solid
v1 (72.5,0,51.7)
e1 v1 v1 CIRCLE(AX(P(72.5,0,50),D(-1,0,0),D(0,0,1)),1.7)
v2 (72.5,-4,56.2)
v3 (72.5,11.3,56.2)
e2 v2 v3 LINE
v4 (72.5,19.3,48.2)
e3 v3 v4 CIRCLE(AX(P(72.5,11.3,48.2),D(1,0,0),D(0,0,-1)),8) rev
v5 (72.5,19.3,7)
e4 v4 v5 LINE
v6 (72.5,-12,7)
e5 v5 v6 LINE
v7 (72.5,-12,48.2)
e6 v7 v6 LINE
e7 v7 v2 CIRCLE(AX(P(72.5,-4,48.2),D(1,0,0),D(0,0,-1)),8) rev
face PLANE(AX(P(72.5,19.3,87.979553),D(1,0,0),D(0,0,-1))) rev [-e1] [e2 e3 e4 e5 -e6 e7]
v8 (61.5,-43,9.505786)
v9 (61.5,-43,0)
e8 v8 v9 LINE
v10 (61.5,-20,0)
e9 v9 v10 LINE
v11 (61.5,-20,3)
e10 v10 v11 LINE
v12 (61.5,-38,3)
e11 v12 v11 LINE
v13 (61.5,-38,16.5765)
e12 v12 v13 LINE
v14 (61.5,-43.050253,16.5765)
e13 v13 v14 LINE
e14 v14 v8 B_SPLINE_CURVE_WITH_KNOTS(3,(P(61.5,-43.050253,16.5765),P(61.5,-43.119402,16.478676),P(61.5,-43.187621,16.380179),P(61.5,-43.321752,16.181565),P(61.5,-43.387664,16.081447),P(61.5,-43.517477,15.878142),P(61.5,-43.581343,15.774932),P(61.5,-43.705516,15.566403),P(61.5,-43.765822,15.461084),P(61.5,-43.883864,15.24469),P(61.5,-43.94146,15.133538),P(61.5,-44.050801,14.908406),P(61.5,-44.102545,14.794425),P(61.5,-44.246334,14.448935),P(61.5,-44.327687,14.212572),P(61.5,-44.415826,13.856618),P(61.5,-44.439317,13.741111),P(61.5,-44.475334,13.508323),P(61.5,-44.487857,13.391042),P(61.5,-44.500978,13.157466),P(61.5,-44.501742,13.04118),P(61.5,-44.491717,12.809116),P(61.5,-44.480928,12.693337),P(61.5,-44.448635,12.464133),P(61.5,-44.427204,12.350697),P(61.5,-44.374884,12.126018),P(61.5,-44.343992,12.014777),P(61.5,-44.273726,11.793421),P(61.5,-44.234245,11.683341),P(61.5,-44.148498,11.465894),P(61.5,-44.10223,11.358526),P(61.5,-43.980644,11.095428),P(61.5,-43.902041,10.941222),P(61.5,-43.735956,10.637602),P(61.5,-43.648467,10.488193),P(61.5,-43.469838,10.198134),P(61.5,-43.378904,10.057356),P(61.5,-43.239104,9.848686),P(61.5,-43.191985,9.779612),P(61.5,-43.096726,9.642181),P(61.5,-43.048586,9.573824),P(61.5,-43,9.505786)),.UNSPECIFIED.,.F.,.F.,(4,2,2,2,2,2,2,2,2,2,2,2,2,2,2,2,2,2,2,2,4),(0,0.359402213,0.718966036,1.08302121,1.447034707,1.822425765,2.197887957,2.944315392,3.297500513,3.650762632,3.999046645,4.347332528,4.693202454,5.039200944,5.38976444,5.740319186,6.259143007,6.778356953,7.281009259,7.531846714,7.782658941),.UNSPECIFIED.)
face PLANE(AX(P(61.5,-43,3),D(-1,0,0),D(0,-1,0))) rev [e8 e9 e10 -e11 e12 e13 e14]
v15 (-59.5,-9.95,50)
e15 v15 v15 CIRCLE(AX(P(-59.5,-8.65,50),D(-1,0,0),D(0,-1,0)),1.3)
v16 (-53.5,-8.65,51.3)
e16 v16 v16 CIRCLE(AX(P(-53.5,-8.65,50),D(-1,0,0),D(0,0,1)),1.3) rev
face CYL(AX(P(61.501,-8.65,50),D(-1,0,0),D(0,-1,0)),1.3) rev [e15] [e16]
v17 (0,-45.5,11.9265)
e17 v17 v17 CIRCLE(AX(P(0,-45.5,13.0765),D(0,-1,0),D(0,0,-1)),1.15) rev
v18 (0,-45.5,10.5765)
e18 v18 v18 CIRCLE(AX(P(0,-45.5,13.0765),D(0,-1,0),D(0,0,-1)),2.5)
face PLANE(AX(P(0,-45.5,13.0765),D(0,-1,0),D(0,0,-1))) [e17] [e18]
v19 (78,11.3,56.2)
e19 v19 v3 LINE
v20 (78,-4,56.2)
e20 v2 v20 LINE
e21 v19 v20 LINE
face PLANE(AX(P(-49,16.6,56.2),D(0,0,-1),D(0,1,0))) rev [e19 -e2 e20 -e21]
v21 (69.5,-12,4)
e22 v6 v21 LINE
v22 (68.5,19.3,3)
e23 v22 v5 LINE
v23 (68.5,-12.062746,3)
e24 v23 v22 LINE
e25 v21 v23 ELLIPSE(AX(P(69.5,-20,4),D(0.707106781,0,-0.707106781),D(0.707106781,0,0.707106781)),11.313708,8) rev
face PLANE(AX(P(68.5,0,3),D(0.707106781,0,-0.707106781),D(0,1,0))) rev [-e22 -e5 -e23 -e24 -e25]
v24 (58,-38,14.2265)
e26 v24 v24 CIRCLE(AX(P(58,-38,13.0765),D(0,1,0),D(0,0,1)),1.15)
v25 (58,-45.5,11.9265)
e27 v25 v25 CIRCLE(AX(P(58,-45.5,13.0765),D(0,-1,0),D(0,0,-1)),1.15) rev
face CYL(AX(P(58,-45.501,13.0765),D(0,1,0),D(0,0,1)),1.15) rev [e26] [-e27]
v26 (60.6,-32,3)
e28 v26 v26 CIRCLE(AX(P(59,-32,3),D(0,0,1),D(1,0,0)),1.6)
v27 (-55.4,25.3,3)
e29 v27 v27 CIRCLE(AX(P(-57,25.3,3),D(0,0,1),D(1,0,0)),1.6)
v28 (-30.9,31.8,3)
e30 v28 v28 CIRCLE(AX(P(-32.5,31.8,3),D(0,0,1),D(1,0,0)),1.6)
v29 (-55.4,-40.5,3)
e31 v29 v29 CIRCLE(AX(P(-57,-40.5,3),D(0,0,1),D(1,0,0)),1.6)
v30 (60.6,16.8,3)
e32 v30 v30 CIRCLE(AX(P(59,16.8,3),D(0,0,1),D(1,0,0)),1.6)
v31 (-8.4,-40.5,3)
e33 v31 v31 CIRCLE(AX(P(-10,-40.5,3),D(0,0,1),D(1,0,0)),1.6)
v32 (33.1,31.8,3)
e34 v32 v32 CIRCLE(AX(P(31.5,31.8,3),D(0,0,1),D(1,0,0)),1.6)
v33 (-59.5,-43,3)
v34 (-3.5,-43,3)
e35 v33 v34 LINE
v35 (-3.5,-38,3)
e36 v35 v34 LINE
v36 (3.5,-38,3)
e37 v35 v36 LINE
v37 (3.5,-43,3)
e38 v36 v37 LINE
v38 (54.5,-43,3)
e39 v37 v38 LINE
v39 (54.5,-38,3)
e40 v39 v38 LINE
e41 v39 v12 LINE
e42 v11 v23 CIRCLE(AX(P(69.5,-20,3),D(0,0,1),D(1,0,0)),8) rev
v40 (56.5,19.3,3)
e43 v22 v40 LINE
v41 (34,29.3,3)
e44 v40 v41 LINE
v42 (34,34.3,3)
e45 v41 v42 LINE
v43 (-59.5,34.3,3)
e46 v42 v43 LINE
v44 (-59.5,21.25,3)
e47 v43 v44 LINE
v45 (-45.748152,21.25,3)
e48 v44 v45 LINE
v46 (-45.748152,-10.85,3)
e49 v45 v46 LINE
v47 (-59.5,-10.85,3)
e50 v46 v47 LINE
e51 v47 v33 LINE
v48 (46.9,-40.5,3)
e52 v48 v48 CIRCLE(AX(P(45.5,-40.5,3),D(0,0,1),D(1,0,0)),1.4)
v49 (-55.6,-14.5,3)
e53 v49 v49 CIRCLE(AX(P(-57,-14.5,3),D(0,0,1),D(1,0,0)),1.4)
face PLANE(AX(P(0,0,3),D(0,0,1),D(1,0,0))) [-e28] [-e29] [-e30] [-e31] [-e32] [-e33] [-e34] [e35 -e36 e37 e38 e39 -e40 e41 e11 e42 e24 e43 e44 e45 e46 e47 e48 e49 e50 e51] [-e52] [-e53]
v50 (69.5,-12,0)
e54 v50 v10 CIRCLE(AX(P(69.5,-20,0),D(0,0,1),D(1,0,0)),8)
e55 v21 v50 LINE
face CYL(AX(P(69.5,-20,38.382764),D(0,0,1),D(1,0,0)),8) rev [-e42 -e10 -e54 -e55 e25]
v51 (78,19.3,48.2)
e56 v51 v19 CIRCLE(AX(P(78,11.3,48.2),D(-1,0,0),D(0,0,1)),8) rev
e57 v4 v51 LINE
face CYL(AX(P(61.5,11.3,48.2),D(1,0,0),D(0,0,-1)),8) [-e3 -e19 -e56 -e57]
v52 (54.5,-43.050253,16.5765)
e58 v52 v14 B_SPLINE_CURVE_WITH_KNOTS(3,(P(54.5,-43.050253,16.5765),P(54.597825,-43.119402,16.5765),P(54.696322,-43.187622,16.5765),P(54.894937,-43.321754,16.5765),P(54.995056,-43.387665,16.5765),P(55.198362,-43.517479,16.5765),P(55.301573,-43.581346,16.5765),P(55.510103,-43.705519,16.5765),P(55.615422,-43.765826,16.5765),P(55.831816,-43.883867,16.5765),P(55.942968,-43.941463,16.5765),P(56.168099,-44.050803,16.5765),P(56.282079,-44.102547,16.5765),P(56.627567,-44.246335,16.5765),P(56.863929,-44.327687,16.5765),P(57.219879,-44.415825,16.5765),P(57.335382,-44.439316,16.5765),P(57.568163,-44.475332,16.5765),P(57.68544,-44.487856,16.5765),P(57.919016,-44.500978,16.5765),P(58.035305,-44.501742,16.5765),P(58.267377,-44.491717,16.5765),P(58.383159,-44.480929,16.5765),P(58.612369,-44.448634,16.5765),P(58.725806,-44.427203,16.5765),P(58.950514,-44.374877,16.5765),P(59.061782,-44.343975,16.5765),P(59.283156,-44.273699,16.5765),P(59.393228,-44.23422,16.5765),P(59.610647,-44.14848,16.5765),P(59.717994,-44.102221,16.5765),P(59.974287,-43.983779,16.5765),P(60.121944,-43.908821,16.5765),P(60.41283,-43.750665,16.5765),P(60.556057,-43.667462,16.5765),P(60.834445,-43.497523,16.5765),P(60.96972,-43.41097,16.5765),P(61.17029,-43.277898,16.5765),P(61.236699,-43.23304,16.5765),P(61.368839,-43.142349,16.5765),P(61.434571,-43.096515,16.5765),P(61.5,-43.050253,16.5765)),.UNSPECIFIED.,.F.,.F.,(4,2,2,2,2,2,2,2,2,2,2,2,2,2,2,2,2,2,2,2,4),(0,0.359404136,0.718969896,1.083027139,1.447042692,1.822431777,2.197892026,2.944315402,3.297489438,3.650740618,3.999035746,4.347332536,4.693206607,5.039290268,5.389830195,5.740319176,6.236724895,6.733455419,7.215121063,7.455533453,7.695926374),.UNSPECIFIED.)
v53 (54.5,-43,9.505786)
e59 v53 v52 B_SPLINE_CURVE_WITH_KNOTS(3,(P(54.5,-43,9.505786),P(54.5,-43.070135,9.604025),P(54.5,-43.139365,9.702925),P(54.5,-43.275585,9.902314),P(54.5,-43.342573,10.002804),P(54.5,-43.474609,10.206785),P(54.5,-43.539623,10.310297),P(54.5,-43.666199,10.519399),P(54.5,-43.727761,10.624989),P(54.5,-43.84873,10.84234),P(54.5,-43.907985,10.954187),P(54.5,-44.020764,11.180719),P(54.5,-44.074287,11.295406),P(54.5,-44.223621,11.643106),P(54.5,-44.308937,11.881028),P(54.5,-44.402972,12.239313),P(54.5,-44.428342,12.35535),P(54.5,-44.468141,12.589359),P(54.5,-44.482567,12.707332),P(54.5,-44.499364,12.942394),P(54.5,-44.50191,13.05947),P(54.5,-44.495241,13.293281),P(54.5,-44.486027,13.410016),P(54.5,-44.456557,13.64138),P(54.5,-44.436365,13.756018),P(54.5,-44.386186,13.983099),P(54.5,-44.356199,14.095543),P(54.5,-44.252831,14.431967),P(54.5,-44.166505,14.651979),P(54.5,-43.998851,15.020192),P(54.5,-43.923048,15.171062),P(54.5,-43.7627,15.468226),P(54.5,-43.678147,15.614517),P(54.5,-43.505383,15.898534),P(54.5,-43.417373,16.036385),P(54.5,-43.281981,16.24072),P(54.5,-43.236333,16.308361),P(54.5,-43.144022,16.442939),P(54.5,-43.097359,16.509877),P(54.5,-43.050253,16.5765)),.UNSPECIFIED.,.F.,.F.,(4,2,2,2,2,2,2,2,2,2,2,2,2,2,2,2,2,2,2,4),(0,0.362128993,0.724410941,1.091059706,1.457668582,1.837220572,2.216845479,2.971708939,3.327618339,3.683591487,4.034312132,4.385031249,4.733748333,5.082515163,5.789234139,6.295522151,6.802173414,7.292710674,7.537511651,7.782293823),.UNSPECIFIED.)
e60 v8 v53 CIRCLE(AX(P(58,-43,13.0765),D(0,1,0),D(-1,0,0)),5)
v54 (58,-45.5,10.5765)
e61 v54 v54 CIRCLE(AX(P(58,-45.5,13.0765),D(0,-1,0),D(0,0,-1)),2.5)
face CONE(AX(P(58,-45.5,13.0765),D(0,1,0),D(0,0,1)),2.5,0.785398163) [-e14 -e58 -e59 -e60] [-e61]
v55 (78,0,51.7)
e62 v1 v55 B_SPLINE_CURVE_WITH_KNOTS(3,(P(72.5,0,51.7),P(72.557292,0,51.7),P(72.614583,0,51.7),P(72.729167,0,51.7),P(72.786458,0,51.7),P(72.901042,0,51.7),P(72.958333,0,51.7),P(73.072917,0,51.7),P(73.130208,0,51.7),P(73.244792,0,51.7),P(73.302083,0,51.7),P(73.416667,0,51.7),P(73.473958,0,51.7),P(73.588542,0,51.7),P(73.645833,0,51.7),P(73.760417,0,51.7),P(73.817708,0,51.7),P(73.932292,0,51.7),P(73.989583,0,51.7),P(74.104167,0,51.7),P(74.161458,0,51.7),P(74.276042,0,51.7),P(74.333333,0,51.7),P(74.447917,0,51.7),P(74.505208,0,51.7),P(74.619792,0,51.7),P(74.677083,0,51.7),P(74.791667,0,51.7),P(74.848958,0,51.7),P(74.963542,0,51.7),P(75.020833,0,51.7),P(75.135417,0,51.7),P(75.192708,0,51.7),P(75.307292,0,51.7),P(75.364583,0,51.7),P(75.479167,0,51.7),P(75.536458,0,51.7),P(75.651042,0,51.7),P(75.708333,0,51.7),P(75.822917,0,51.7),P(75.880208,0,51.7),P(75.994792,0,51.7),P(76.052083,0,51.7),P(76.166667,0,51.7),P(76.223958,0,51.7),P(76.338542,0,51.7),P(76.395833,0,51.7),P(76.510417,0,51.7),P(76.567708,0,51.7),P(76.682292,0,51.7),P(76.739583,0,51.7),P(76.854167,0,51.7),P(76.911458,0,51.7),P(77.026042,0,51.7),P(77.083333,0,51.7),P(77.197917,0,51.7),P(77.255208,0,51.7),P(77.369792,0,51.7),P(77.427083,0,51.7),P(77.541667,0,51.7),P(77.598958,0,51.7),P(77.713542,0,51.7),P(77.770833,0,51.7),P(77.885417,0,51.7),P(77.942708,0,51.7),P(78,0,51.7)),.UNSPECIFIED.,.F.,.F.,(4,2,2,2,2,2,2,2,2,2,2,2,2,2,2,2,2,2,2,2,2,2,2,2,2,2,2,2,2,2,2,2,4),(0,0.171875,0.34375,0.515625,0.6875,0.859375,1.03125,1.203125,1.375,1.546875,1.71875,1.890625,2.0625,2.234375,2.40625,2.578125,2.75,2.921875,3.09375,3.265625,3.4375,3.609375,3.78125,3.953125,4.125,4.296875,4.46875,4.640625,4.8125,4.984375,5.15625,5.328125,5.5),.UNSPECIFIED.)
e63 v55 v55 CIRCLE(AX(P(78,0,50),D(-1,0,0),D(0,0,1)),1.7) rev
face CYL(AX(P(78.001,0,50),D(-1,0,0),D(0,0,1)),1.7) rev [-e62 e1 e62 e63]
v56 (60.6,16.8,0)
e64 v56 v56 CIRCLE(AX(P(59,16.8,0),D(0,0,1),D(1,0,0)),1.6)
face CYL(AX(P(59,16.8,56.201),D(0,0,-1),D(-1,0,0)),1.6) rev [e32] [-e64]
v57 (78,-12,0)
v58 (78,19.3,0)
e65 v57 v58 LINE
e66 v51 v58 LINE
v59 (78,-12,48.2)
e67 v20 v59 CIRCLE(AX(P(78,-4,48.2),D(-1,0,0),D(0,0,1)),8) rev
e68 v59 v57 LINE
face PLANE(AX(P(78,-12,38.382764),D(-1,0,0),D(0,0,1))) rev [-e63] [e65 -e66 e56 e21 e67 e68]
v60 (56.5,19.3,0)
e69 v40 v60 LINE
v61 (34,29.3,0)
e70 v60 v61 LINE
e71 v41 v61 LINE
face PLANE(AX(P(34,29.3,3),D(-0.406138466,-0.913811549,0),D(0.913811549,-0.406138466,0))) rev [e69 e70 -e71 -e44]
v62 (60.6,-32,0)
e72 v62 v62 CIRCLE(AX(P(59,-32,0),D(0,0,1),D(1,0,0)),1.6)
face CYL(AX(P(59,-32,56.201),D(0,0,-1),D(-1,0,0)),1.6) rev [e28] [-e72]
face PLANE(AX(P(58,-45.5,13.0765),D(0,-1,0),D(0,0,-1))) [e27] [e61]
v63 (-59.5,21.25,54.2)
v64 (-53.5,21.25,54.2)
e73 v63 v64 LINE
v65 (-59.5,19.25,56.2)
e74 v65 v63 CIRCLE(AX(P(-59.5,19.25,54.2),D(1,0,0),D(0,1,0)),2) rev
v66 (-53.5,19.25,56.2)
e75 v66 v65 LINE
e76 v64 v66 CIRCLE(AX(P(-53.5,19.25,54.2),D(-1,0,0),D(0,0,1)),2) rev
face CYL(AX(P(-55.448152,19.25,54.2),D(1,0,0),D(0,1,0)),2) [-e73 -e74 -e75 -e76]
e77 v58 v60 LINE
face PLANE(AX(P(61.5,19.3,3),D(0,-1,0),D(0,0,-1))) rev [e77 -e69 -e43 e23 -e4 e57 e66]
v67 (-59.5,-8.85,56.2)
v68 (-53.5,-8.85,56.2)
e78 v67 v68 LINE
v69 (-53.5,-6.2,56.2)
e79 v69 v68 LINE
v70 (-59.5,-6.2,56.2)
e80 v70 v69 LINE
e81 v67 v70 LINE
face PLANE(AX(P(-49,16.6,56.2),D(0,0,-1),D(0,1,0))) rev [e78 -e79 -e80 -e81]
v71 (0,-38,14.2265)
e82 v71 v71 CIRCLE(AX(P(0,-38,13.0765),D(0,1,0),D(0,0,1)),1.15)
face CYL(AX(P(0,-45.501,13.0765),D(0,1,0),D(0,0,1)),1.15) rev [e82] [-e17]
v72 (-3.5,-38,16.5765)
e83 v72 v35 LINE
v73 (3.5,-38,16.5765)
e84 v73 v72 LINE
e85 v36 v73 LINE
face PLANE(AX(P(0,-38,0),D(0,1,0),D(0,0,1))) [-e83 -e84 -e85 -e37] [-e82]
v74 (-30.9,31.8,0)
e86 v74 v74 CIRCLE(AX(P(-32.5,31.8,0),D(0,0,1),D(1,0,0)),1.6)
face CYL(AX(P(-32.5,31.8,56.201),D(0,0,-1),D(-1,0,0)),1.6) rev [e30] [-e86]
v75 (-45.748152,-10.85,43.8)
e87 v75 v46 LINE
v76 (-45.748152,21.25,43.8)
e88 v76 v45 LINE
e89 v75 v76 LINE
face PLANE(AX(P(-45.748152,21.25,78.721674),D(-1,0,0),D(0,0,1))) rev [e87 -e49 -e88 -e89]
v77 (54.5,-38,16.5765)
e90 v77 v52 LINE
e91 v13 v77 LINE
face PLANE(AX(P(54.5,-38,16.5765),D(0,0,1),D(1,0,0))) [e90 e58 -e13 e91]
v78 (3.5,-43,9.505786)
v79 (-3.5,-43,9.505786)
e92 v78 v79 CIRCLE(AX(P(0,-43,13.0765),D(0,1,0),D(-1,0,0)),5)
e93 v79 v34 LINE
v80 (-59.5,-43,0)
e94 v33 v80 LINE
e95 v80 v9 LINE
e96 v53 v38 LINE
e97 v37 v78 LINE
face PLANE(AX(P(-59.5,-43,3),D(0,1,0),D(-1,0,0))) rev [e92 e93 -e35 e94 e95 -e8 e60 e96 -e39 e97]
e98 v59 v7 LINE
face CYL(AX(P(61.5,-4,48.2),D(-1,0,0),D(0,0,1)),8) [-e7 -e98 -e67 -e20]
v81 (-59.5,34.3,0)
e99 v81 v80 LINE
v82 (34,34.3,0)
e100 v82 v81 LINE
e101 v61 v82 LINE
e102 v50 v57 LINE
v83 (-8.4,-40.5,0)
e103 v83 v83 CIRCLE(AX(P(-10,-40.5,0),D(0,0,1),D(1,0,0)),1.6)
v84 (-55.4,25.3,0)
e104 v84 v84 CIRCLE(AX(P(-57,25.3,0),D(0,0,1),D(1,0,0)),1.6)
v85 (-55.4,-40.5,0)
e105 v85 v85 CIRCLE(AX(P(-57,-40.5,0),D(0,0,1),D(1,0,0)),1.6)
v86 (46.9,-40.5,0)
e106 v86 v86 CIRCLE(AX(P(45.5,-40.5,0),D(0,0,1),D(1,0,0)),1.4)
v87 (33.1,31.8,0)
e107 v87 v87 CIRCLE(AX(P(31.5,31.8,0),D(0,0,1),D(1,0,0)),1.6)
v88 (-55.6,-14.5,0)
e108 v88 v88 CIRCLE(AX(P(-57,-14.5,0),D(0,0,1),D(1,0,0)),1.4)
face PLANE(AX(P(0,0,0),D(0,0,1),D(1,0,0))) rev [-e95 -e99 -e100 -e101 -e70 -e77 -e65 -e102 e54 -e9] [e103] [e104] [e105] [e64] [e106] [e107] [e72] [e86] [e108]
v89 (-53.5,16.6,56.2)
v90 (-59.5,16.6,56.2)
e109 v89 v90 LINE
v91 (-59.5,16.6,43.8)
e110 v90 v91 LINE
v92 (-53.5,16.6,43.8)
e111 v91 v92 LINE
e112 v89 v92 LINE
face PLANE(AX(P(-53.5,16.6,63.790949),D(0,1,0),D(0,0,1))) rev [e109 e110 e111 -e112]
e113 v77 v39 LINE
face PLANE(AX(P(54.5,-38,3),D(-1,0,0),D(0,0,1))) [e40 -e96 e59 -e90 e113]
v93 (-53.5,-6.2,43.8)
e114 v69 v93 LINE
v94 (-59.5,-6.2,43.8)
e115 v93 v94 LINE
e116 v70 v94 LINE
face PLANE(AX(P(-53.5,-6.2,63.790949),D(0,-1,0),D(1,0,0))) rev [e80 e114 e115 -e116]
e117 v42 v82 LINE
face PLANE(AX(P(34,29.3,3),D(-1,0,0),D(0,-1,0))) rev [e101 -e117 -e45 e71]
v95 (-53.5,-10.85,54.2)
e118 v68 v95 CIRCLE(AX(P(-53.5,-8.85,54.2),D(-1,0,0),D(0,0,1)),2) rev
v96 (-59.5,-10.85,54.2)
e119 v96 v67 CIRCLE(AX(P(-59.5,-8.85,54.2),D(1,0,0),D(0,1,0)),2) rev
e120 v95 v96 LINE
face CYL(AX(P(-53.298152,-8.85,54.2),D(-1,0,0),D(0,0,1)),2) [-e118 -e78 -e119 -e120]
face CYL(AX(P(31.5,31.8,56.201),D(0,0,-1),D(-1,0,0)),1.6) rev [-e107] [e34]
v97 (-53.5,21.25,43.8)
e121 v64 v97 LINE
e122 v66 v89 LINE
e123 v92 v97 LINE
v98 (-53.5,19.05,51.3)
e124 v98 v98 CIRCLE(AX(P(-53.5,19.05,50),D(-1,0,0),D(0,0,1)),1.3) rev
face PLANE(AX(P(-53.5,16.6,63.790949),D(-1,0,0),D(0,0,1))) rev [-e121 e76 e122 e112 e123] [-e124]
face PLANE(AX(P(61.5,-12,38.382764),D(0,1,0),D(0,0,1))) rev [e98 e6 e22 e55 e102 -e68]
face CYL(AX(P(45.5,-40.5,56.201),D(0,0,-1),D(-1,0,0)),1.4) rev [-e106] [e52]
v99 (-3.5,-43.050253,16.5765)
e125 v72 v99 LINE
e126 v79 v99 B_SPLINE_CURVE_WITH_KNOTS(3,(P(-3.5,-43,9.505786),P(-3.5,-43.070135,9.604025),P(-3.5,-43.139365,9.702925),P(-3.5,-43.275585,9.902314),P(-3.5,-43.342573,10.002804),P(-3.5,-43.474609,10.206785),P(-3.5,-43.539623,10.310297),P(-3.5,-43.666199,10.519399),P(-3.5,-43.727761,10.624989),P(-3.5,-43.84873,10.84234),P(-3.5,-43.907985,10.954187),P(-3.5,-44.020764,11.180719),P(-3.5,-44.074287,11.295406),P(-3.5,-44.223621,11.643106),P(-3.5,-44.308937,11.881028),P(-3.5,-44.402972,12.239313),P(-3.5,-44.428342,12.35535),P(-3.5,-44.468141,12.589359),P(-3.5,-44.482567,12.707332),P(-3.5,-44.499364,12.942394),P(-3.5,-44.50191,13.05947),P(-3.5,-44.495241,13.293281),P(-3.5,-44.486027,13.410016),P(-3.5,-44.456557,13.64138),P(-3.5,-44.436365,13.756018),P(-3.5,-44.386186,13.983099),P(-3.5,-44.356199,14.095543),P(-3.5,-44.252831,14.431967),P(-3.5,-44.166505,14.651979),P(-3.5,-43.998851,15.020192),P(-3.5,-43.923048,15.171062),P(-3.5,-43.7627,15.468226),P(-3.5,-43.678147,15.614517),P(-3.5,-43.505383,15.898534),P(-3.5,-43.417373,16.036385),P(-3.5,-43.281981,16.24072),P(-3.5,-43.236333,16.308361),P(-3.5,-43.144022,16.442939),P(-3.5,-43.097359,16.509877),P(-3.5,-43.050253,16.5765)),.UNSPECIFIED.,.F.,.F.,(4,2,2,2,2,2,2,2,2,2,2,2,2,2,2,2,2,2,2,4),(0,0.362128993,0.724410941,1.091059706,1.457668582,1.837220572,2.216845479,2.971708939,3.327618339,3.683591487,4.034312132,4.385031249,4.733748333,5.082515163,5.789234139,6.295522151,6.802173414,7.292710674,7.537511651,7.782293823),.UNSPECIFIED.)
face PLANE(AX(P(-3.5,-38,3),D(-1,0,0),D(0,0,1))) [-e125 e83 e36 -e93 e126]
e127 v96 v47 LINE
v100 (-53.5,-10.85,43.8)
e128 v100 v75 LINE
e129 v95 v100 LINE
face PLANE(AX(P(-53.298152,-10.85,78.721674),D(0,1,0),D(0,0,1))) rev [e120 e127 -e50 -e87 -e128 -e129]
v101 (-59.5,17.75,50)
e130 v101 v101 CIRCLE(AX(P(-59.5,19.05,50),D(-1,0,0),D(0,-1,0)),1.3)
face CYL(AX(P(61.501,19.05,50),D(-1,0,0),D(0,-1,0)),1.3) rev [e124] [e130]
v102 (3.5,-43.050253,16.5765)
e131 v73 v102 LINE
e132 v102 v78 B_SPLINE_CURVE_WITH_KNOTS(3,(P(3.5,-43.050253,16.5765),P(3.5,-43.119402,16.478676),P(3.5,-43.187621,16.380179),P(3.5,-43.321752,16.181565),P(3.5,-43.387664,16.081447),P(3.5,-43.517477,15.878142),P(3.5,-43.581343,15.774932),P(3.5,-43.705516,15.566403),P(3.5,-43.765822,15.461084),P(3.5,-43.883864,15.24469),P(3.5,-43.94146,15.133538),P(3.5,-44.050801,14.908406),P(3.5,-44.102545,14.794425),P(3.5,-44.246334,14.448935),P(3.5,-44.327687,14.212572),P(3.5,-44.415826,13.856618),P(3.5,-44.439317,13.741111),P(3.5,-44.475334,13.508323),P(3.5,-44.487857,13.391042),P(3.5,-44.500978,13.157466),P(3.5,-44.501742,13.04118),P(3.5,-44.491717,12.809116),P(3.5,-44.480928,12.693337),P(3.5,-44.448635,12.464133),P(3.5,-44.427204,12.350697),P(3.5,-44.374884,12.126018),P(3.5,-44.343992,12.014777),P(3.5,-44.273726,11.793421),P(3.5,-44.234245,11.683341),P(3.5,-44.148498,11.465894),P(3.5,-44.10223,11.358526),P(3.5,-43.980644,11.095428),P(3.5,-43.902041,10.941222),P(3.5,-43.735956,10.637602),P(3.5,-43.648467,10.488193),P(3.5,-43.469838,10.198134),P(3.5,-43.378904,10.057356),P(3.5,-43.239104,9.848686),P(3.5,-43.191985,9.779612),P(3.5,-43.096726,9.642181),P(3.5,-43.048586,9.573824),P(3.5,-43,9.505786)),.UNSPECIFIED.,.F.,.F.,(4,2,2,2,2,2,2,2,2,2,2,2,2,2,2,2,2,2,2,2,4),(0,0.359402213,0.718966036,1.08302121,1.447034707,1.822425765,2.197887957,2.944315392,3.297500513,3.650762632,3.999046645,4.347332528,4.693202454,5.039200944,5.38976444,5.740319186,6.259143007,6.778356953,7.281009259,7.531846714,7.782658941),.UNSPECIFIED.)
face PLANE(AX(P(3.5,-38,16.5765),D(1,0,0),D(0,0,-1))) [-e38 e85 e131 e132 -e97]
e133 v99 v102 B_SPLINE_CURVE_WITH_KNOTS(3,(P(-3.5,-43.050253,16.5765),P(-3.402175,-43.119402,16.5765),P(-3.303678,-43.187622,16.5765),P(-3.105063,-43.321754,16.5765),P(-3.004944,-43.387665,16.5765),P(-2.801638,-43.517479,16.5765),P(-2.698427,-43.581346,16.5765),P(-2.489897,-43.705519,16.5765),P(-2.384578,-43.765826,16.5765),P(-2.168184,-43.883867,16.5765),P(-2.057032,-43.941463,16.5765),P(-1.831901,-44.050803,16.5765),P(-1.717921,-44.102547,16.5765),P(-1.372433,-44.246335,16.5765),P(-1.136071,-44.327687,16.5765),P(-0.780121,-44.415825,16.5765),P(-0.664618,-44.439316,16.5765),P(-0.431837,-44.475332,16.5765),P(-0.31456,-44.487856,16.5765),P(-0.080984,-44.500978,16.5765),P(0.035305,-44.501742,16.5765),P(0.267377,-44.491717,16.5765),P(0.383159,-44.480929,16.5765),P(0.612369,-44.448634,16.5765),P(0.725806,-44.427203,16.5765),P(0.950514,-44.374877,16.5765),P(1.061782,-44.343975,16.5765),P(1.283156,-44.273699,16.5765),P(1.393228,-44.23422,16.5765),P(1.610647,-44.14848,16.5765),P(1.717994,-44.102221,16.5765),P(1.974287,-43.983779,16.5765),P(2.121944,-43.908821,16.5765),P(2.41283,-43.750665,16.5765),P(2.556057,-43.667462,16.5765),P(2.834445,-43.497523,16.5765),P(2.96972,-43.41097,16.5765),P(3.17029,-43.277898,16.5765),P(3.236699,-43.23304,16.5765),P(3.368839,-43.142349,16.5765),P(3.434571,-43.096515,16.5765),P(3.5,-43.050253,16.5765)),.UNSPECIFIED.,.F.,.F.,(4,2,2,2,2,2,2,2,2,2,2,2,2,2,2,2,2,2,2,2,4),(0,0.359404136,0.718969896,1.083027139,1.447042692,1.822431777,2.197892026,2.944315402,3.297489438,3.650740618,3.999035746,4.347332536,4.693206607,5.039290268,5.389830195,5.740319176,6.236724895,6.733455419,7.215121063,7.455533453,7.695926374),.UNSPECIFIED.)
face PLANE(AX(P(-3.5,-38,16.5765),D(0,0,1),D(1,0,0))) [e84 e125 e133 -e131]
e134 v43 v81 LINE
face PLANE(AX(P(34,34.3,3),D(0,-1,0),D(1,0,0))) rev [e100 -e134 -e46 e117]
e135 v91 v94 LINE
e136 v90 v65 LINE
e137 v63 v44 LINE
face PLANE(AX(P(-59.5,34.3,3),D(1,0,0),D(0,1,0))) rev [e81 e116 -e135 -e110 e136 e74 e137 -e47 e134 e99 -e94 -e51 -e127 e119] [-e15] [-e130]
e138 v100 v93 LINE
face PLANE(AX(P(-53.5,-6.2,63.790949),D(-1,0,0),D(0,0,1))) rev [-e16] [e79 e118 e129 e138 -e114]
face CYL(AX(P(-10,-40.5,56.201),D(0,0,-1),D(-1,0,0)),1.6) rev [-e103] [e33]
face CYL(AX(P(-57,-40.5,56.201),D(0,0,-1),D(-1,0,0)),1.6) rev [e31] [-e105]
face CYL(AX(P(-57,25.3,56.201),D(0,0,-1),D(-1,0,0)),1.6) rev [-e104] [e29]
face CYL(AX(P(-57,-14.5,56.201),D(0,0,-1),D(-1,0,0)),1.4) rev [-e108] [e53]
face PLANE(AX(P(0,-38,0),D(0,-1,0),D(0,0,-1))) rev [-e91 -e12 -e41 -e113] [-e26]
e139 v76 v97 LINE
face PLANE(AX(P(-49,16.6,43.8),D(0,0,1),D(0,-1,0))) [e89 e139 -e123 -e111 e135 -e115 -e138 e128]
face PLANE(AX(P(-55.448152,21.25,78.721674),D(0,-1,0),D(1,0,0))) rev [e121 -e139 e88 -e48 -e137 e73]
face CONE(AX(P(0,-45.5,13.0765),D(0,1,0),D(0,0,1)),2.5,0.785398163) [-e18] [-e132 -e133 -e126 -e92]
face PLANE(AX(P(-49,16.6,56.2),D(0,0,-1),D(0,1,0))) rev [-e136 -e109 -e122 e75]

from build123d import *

# Parameters (mm, degrees)
BASE_DEPTH          = 3
SERVO_SUPPORT_DEPTH = 43.8
SKETCH21_W          = 6
SKETCH21_H          = 4.65
SERVO_MOUNTS_DEPTH  = 12.4
SERVO_SCREWS_REACH  = 142.173
SKETCH22_R          = 1.3
FILLET1_R           = 2
SKETCH23_W          = 16.5
SKETCH23_H          = 31.3
SHAFT_SUPPORT_DEPTH = 3
SKETCH24_W          = 5.5
SKETCH24_H          = 31.3
BOSS_EXTRUDE6_DEPTH = 56.2
FILLET2_R           = 8
FILLET3_R           = 8
SHAFT_REACH         = 151.771
SKETCH25_R          = 1.7
SCREWS_REACH        = 107.316
SKETCH26_R          = 1.6
SKETCH26_R_2        = 1.4
SKETCH31_W          = 7
SKETCH31_H          = 13.5765
BOSS_EXTRUDE8_DEPTH = 5
SKETCH30_R          = 2.5
BOSS_EXTRUDE9_DEPTH = 2.5
CUT_EXTRUDE1_REACH  = 122.29
SKETCH32_R          = 1.15
CHAMFER1_SIZE       = 2.5
CHAMFER2_SIZE       = 4


with BuildPart() as part:
    # Sketch19 → Base (new body)
    with BuildSketch(Plane.XY):
        Polygon((61.5, 19.3), (56.5, 19.3), (34, 29.3), (34, 34.3), (-59.5, 34.3), (-59.5, -43), (61.5, -43), align=None)
    extrude(amount=BASE_DEPTH)

    # Sketch20 → Servo support (add)
    with BuildSketch(Plane.XY):
        Polygon((-53.298152188, -10.85), (-55.448152188, -10.85), (-59.5, -10.85), (-59.5, 21.25), (-55.448152188, 21.25), (-53.298152188, 21.25), (-45.748152188, 21.25), (-45.748152188, 8.609473612), (-45.748152188, -10.85), align=None)
    extrude(amount=SERVO_SUPPORT_DEPTH)

    # Sketch21 → Servo mounts (add)
    with BuildSketch(Plane.XY.offset(43.8)):
        with Locations((-56.5, -8.525)):
            Rectangle(SKETCH21_W, SKETCH21_H)
        with Locations((-56.5, 18.925)):
            Rectangle(SKETCH21_W, SKETCH21_H)
    extrude(amount=SERVO_MOUNTS_DEPTH)

    # Sketch22 → Servo screws (cut, up to next)
    with BuildSketch(Plane.ZY.offset(59.5), mode=Mode.PRIVATE) as servo_screws_sk1:
        with Locations(Location((50, -8.65, 0), (0, 0, 270))):
            Circle(SKETCH22_R)
    servo_screws_tool1 = extrude(servo_screws_sk1.sketch, amount=-SERVO_SCREWS_REACH, mode=Mode.PRIVATE) & part.part
    # Sketch22 → Servo screws (cut, up to next)
    with BuildSketch(Plane.ZY.offset(59.5), mode=Mode.PRIVATE) as servo_screws_sk2:
        with Locations(Location((50, 19.05, 0), (0, 0, 270))):
            Circle(SKETCH22_R)
    servo_screws_tool2 = extrude(servo_screws_sk2.sketch, amount=-SERVO_SCREWS_REACH, mode=Mode.PRIVATE) & part.part
    add(servo_screws_tool1.solids().sort_by_distance((-59.5, -8.65, 50))[0], mode=Mode.SUBTRACT)
    add(servo_screws_tool2.solids().sort_by_distance((-59.5, 19.05, 50))[0], mode=Mode.SUBTRACT)

    # Fillet1
    fillet1_edges = [part.edges().sort_by_distance(p)[0] for p in [
        (-56.5, 21.25, 56.2),
        (-56.5, -10.85, 56.2),
    ]]
    fillet(fillet1_edges, radius=FILLET1_R)

    # Sketch23 → Shaft support (add)
    with BuildSketch(Plane.XY):
        with Locations((69.75, 3.65)):
            Rectangle(SKETCH23_W, SKETCH23_H)
    extrude(amount=SHAFT_SUPPORT_DEPTH)

    # Sketch24 → Boss-Extrude6 (add)
    with BuildSketch(Plane.XY):
        with Locations((75.25, 3.65)):
            Rectangle(SKETCH24_W, SKETCH24_H)
    extrude(amount=BOSS_EXTRUDE6_DEPTH)

    # Fillet2
    fillet2_edges = [part.edges().sort_by_distance(p)[0] for p in [
        (61.5, -12, 1.5),
    ]]
    fillet(fillet2_edges, radius=FILLET2_R)

    # Fillet3
    fillet3_edges = [part.edges().sort_by_distance(p)[0] for p in [
        (75.25, 19.3, 56.2),
        (75.25, -12, 56.2),
    ]]
    fillet(fillet3_edges, radius=FILLET3_R)

    # Sketch25 → Shaft (cut, up to next)
    with BuildSketch(Plane.ZY.offset(-72.5), mode=Mode.PRIVATE) as shaft_sk1:
        with Locations((50, 0)):
            Circle(SKETCH25_R)
    shaft_tool1 = extrude(shaft_sk1.sketch, amount=-SHAFT_REACH, mode=Mode.PRIVATE) & part.part
    add(shaft_tool1.solids().sort_by_distance((72.5, 0, 50))[0], mode=Mode.SUBTRACT)

    # Sketch26 → Screws (cut, up to next)
    with BuildSketch(Plane.XY, mode=Mode.PRIVATE) as screws_sk1:
        with Locations((-57, -40.5)):
            Circle(SKETCH26_R)
    screws_tool1 = extrude(screws_sk1.sketch, amount=SCREWS_REACH, mode=Mode.PRIVATE) & part.part
    # Sketch26 → Screws (cut, up to next)
    with BuildSketch(Plane.XY, mode=Mode.PRIVATE) as screws_sk2:
        with Locations((-10, -40.5)):
            Circle(SKETCH26_R)
    screws_tool2 = extrude(screws_sk2.sketch, amount=SCREWS_REACH, mode=Mode.PRIVATE) & part.part
    # Sketch26 → Screws (cut, up to next)
    with BuildSketch(Plane.XY, mode=Mode.PRIVATE) as screws_sk3:
        with Locations((59, -32)):
            Circle(SKETCH26_R)
    screws_tool3 = extrude(screws_sk3.sketch, amount=SCREWS_REACH, mode=Mode.PRIVATE) & part.part
    # Sketch26 → Screws (cut, up to next)
    with BuildSketch(Plane.XY, mode=Mode.PRIVATE) as screws_sk4:
        with Locations((59, 16.8)):
            Circle(SKETCH26_R)
    screws_tool4 = extrude(screws_sk4.sketch, amount=SCREWS_REACH, mode=Mode.PRIVATE) & part.part
    # Sketch26 → Screws (cut, up to next)
    with BuildSketch(Plane.XY, mode=Mode.PRIVATE) as screws_sk5:
        with Locations((31.5, 31.8)):
            Circle(SKETCH26_R)
    screws_tool5 = extrude(screws_sk5.sketch, amount=SCREWS_REACH, mode=Mode.PRIVATE) & part.part
    # Sketch26 → Screws (cut, up to next)
    with BuildSketch(Plane.XY, mode=Mode.PRIVATE) as screws_sk6:
        with Locations((-32.5, 31.8)):
            Circle(SKETCH26_R)
    screws_tool6 = extrude(screws_sk6.sketch, amount=SCREWS_REACH, mode=Mode.PRIVATE) & part.part
    # Sketch26 → Screws (cut, up to next)
    with BuildSketch(Plane.XY, mode=Mode.PRIVATE) as screws_sk7:
        with Locations((-57, 25.3)):
            Circle(SKETCH26_R)
    screws_tool7 = extrude(screws_sk7.sketch, amount=SCREWS_REACH, mode=Mode.PRIVATE) & part.part
    # Sketch26 → Screws (cut, up to next)
    with BuildSketch(Plane.XY, mode=Mode.PRIVATE) as screws_sk8:
        with Locations((-57, -14.5)):
            Circle(SKETCH26_R_2)
    screws_tool8 = extrude(screws_sk8.sketch, amount=SCREWS_REACH, mode=Mode.PRIVATE) & part.part
    # Sketch26 → Screws (cut, up to next)
    with BuildSketch(Plane.XY, mode=Mode.PRIVATE) as screws_sk9:
        with Locations((45.5, -40.5)):
            Circle(SKETCH26_R_2)
    screws_tool9 = extrude(screws_sk9.sketch, amount=SCREWS_REACH, mode=Mode.PRIVATE) & part.part
    add(screws_tool1.solids().sort_by_distance((-57, -40.5, 0))[0], mode=Mode.SUBTRACT)
    add(screws_tool2.solids().sort_by_distance((-10, -40.5, 0))[0], mode=Mode.SUBTRACT)
    add(screws_tool3.solids().sort_by_distance((59, -32, 0))[0], mode=Mode.SUBTRACT)
    add(screws_tool4.solids().sort_by_distance((59, 16.8, 0))[0], mode=Mode.SUBTRACT)
    add(screws_tool5.solids().sort_by_distance((31.5, 31.8, 0))[0], mode=Mode.SUBTRACT)
    add(screws_tool6.solids().sort_by_distance((-32.5, 31.8, 0))[0], mode=Mode.SUBTRACT)
    add(screws_tool7.solids().sort_by_distance((-57, 25.3, 0))[0], mode=Mode.SUBTRACT)
    add(screws_tool8.solids().sort_by_distance((-57, -14.5, 0))[0], mode=Mode.SUBTRACT)
    add(screws_tool9.solids().sort_by_distance((45.5, -40.5, 0))[0], mode=Mode.SUBTRACT)

    # Sketch31 → Boss-Extrude8 (add)
    with BuildSketch(Plane.XZ.offset(43)):
        with Locations((0, 9.78825)):
            Rectangle(SKETCH31_W, SKETCH31_H)
        with Locations((58, 9.78825)):
            Rectangle(SKETCH31_W, SKETCH31_H)
    extrude(amount=-BOSS_EXTRUDE8_DEPTH)

    # Sketch30 → Boss-Extrude9 (add)
    with BuildSketch(Plane.XZ.offset(43)):
        with Locations(Location((0, 13.0765, 0), (0, 0, 180))):
            Circle(SKETCH30_R)
        with Locations(Location((58, 13.0765, 0), (0, 0, 180))):
            Circle(SKETCH30_R)
    extrude(amount=BOSS_EXTRUDE9_DEPTH)

    # Sketch32 → Cut-Extrude1 (cut, up to next)
    with BuildSketch(Plane(origin=(0, -38, 0), x_dir=(1, 0, 0), z_dir=(0, 1, 0)), mode=Mode.PRIVATE) as cut_extrude1_sk1:
        with Locations(Location((0, -13.0765, 0), (0, 0, 270))):
            Circle(SKETCH32_R)
    cut_extrude1_tool1 = extrude(cut_extrude1_sk1.sketch, amount=-CUT_EXTRUDE1_REACH, mode=Mode.PRIVATE) & part.part
    # Sketch32 → Cut-Extrude1 (cut, up to next)
    with BuildSketch(Plane(origin=(0, -38, 0), x_dir=(1, 0, 0), z_dir=(0, 1, 0)), mode=Mode.PRIVATE) as cut_extrude1_sk2:
        with Locations(Location((58, -13.0765, 0), (0, 0, 270))):
            Circle(SKETCH32_R)
    cut_extrude1_tool2 = extrude(cut_extrude1_sk2.sketch, amount=-CUT_EXTRUDE1_REACH, mode=Mode.PRIVATE) & part.part
    add(cut_extrude1_tool1.solids().sort_by_distance((0, -38, 13.0765))[0], mode=Mode.SUBTRACT)
    add(cut_extrude1_tool2.solids().sort_by_distance((58, -38, 13.0765))[0], mode=Mode.SUBTRACT)

    # Chamfer1
    # the kernel refuses this chamfer: 2.5 mm, written as the material it adds along each edge
    with BuildSketch(Plane(origin=(58, -43, 13.0765), x_dir=(-1, 0, 0), z_dir=(0, 0, 1))) as chamfer1_piece_1_section:
        Polygon((2.5 + CHAMFER1_SIZE, 0), (2.5, CHAMFER1_SIZE), (2.5, 0), align=None)
    chamfer1_piece_1 = revolve(axis=Axis((58, -43, 13.0765), (0, -1, 0)), mode=Mode.PRIVATE)
    chamfer1_piece_1 = split(chamfer1_piece_1, bisect_by=Plane(origin=(61.5, -43.330528144, 9.079752975), z_dir=(-1, 0, 0)), keep=Keep.TOP, mode=Mode.PRIVATE)
    chamfer1_piece_1 = split(chamfer1_piece_1, bisect_by=Plane(origin=(54.5, -43.330528144, 9.079752975), z_dir=(1, 0, 0)), keep=Keep.TOP, mode=Mode.PRIVATE)
    chamfer1_piece_1 = split(chamfer1_piece_1, bisect_by=Plane(origin=(55.692477029, -43.330528144, 16.5765), z_dir=(0, 0, -1)), keep=Keep.TOP, mode=Mode.PRIVATE)
    chamfer1_piece_1 = split(chamfer1_piece_1, bisect_by=Plane(origin=(55.692477029, -45.5, 9.079752975), z_dir=(0, 1, 0)), keep=Keep.TOP, mode=Mode.PRIVATE)
    add(chamfer1_piece_1)
    with BuildSketch(Plane(origin=(0, -43, 13.0765), x_dir=(-1, 0, 0), z_dir=(0, 0, 1))) as chamfer1_piece_2_section:
        Polygon((2.5 + CHAMFER1_SIZE, 0), (2.5, CHAMFER1_SIZE), (2.5, 0), align=None)
    chamfer1_piece_2 = revolve(axis=Axis((0, -43, 13.0765), (0, -1, 0)), mode=Mode.PRIVATE)
    chamfer1_piece_2 = split(chamfer1_piece_2, bisect_by=Plane(origin=(-3.5, -43.330528144, 9.079752976), z_dir=(1, 0, 0)), keep=Keep.TOP, mode=Mode.PRIVATE)
    chamfer1_piece_2 = split(chamfer1_piece_2, bisect_by=Plane(origin=(-2.30752297, -43.330528144, 16.5765), z_dir=(0, 0, -1)), keep=Keep.TOP, mode=Mode.PRIVATE)
    chamfer1_piece_2 = split(chamfer1_piece_2, bisect_by=Plane(origin=(3.5, -43.330528144, 9.079752976), z_dir=(-1, 0, 0)), keep=Keep.TOP, mode=Mode.PRIVATE)
    chamfer1_piece_2 = split(chamfer1_piece_2, bisect_by=Plane(origin=(-2.30752297, -45.5, 9.079752976), z_dir=(0, 1, 0)), keep=Keep.TOP, mode=Mode.PRIVATE)
    add(chamfer1_piece_2)

    # Chamfer2
    chamfer2_edges = [part.edges().sort_by_distance(p)[0] for p in [
        (72.5, 3.65, 3),
    ]]
    chamfer(chamfer2_edges, length=CHAMFER2_SIZE)


solid = part.part
